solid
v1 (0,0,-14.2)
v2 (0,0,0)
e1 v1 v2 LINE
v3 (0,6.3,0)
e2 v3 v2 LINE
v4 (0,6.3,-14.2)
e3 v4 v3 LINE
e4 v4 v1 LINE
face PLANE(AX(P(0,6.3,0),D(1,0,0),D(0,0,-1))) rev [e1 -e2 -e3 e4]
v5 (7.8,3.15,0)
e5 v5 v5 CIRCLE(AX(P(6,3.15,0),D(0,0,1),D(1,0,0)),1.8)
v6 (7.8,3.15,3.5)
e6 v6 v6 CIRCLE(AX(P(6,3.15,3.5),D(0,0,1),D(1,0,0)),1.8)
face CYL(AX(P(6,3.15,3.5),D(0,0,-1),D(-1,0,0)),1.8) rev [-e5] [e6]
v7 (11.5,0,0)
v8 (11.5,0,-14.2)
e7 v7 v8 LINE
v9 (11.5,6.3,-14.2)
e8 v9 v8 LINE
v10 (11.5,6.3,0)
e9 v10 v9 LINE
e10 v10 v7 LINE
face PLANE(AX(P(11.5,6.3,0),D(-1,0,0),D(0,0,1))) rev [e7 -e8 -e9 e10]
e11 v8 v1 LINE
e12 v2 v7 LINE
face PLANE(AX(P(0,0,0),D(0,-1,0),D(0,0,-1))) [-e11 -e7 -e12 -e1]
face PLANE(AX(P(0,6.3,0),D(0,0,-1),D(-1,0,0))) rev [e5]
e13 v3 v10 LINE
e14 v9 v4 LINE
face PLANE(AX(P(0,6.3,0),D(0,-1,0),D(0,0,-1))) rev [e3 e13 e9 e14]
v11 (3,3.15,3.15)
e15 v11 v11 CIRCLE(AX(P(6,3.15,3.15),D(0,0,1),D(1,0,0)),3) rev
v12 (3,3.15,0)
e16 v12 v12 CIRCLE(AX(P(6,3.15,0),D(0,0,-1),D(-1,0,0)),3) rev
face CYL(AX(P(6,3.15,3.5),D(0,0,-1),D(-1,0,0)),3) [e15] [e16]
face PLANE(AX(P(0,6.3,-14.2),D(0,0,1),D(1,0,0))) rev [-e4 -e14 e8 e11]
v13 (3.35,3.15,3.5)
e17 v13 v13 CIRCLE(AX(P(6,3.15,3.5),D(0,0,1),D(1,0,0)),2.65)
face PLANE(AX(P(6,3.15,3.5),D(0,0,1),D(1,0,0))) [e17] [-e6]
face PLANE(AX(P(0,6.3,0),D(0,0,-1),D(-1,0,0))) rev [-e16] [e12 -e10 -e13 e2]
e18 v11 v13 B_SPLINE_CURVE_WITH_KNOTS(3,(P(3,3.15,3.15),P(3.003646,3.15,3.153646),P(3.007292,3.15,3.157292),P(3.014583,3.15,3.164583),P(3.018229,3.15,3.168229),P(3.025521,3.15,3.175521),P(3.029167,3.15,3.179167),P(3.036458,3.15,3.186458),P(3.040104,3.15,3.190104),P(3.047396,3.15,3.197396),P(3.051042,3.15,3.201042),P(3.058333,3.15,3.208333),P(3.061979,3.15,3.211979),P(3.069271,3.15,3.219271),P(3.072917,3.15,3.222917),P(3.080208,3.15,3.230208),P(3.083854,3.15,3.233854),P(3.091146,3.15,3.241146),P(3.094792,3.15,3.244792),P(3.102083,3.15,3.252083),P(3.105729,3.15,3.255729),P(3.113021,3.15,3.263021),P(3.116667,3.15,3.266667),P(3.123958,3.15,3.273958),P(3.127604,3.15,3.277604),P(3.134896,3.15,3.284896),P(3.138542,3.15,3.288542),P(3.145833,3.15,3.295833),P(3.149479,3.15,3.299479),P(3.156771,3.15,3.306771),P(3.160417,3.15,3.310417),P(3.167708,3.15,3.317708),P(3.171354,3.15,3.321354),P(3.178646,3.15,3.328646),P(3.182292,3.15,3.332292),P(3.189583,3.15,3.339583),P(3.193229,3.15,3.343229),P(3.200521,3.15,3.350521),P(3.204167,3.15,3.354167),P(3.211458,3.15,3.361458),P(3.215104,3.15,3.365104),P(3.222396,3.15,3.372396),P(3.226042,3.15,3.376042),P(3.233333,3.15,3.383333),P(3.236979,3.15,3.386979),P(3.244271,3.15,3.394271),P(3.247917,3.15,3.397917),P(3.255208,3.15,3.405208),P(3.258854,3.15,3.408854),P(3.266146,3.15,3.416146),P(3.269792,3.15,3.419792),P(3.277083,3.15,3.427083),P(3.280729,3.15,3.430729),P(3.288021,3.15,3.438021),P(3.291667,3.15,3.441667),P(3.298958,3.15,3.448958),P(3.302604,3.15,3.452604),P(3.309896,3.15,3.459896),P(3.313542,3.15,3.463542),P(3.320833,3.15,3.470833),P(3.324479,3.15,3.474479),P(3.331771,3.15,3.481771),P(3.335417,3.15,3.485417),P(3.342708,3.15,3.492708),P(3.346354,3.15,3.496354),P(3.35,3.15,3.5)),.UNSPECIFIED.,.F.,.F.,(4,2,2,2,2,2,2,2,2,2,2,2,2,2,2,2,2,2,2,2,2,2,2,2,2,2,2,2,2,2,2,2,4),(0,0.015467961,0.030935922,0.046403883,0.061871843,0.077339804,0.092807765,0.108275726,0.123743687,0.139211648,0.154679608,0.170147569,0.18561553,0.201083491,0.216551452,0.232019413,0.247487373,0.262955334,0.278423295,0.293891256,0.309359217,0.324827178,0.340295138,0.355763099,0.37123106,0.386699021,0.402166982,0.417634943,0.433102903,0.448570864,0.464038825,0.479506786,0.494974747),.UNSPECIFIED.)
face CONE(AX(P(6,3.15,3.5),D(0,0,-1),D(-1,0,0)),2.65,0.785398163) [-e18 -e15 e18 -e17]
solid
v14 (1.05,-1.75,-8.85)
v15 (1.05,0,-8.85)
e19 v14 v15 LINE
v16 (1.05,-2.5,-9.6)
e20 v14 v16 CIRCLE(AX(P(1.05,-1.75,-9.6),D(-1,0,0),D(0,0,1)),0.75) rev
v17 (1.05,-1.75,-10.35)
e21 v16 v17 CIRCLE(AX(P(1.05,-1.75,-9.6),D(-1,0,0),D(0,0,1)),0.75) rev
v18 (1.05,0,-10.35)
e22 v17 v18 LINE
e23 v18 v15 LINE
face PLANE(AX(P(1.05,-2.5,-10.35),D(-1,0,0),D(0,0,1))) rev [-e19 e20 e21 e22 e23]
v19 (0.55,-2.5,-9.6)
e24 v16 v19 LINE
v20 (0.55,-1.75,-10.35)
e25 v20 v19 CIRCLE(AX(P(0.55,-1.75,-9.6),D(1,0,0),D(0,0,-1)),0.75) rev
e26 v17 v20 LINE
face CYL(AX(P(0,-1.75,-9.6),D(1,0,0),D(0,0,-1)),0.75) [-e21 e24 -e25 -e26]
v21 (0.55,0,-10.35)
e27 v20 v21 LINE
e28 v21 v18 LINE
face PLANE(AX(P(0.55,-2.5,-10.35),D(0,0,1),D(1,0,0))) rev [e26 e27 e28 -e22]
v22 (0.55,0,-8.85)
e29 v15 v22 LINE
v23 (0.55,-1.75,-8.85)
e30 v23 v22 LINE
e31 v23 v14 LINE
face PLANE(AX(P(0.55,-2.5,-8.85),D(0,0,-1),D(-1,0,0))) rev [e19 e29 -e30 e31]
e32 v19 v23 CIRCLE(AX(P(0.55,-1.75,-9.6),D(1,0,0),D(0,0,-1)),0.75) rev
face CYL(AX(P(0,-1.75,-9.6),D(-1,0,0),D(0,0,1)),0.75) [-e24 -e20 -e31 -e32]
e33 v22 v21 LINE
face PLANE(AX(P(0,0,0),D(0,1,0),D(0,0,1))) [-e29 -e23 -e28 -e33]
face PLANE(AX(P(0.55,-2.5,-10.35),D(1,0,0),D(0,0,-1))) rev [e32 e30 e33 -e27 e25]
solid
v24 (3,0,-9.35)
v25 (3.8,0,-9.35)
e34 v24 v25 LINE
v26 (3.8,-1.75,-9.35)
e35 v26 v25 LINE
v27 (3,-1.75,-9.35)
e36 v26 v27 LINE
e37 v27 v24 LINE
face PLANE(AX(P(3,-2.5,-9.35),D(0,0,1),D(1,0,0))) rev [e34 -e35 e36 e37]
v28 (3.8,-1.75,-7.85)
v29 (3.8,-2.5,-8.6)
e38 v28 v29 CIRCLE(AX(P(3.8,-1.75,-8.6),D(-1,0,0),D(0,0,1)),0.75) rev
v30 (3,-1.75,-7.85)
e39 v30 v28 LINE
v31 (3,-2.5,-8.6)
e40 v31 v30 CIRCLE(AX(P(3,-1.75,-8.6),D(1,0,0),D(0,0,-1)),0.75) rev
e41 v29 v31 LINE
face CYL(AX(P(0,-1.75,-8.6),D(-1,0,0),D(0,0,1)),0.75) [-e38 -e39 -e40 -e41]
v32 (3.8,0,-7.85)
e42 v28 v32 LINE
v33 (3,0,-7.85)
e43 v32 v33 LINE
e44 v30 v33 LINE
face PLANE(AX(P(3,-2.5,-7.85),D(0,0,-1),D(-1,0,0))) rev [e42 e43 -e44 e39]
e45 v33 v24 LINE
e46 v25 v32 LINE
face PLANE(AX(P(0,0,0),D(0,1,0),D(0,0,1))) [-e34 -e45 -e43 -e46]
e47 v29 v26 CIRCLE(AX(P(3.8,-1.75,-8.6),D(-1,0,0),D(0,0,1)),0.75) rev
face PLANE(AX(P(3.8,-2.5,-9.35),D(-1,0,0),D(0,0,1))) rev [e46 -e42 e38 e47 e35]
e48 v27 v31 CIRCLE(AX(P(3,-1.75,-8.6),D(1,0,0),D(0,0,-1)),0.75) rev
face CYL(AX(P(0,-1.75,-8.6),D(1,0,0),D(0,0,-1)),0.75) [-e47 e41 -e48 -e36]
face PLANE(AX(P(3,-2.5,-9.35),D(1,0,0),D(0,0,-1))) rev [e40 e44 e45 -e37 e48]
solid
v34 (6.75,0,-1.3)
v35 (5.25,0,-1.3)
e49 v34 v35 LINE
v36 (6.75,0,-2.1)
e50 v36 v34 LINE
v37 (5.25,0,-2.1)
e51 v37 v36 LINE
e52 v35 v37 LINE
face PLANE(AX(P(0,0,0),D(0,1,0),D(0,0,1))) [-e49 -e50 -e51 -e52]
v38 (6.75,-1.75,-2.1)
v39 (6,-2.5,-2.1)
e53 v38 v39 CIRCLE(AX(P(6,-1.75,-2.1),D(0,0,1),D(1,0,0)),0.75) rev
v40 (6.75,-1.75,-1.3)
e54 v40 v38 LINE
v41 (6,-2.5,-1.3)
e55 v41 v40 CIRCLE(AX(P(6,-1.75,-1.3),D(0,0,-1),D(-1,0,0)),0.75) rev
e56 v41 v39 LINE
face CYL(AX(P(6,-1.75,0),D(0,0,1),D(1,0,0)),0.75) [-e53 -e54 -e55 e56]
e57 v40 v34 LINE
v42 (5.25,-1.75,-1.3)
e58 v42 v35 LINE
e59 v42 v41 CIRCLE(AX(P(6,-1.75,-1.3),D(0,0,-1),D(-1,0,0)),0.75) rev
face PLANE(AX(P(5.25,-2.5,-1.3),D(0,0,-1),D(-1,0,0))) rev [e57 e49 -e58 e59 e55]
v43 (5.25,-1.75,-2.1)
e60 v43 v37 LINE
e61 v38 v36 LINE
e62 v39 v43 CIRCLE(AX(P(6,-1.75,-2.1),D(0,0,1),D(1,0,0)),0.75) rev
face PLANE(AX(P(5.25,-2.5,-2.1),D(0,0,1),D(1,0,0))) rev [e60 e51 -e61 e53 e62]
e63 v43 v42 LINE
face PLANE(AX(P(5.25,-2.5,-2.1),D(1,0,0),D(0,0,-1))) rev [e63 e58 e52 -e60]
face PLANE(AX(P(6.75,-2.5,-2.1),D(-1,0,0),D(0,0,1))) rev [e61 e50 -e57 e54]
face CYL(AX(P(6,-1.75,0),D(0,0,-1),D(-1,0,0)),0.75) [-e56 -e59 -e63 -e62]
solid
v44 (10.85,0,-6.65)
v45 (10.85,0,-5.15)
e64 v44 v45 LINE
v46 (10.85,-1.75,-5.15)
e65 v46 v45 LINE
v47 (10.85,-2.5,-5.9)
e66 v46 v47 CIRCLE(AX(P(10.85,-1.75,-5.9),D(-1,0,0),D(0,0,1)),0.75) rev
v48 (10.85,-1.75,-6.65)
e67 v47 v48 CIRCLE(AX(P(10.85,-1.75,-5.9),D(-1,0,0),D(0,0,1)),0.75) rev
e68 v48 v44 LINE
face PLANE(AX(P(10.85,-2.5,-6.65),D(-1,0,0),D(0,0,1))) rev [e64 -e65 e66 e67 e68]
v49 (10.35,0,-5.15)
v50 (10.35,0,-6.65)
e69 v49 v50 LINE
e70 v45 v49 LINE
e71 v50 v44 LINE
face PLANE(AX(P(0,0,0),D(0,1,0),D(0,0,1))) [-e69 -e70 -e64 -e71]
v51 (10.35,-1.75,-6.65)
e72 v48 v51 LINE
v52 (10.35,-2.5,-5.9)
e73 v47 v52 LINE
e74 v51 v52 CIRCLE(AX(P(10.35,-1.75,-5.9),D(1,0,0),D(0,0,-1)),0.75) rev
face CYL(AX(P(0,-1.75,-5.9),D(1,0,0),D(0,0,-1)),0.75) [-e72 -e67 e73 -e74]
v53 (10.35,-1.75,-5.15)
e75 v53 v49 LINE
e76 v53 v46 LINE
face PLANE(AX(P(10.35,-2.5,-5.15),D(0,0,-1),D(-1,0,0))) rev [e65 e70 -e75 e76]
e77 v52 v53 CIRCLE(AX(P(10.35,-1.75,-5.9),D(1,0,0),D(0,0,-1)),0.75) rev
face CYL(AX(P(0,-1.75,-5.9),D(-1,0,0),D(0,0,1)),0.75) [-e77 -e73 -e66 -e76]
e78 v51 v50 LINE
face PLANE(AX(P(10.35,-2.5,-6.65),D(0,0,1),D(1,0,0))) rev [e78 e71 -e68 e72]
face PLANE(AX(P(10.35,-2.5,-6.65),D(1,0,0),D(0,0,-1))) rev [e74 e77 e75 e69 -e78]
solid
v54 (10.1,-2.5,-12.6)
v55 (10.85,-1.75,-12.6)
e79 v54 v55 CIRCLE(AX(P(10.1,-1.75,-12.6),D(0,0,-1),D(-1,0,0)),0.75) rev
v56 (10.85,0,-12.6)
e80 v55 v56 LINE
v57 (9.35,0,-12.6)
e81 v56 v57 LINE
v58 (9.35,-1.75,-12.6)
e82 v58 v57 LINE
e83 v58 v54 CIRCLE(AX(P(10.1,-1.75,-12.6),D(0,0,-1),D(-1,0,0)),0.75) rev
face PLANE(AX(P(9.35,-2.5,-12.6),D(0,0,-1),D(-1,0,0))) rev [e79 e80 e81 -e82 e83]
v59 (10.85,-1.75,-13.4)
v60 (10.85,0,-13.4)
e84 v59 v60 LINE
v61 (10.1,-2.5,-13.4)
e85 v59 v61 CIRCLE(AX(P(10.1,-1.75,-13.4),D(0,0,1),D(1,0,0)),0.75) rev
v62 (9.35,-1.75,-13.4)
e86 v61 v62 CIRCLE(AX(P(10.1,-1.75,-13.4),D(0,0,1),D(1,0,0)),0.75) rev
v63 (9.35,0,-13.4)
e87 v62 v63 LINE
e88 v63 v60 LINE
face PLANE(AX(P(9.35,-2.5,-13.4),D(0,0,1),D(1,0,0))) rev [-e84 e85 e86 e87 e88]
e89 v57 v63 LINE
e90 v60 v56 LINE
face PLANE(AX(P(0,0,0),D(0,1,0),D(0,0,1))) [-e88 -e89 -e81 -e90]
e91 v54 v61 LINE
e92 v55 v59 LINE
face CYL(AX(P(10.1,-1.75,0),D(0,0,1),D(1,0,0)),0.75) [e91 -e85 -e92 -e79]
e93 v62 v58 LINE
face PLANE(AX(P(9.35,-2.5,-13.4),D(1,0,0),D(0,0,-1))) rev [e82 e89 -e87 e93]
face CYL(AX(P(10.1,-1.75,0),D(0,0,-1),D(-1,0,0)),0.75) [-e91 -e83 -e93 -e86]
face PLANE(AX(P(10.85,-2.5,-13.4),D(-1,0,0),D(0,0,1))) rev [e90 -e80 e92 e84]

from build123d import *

# Parameters (mm, degrees)
SKETCH1_W             = 11.5
SKETCH1_H             = 14.2
BOSS_EXTRUDE1_DEPTH   = 6.3
SKETCH2_R             = 3
SKETCH2_R_2           = 1.8
BOSS_EXTRUDE2_DEPTH   = 3.5
SKETCH3_W             = 1.5
SKETCH3_H             = 0.8
BOSS_EXTRUDE3_DEPTH   = 2.5
SKETCH3_W_2           = 0.8
SKETCH3_H_2           = 1.5
BOSS_EXTRUDE3_2_DEPTH = 2.5
SKETCH3_W_3           = 0.5
BOSS_EXTRUDE3_3_DEPTH = 2.5
BOSS_EXTRUDE3_4_DEPTH = 2.5
BOSS_EXTRUDE3_5_DEPTH = 2.5
FILLET1_R             = 0.75
FILLET2_R             = 0.75
FILLET3_R             = 0.75
FILLET4_R             = 0.75
FILLET5_R             = 0.75
CHAMFER1_SIZE         = 0.35


with BuildPart() as part:
    # Sketch1 → Boss-Extrude1 (new body)
    with BuildSketch(Plane(origin=(0, 0, 0), x_dir=(1, 0, 0), z_dir=(0, 1, 0))):
        with Locations((5.75, 7.1)):
            Rectangle(SKETCH1_W, SKETCH1_H)
    extrude(amount=BOSS_EXTRUDE1_DEPTH)

    # Sketch2 → Boss-Extrude2 (add)
    with BuildSketch(Plane.XY):
        with Locations(Location((6, 3.15, 0), (0, 0, 180))):
            Circle(SKETCH2_R)
        with Locations((6, 3.15)):
            Circle(SKETCH2_R_2, mode=Mode.SUBTRACT)
    extrude(amount=BOSS_EXTRUDE2_DEPTH)

    # Chamfer1
    chamfer1_edges = [part.edges().sort_by_distance(p)[0] for p in [
        (9, 3.15, 3.5),
    ]]
    chamfer(chamfer1_edges, length=CHAMFER1_SIZE)


with BuildPart() as body_2:
    # Sketch3 → Boss-Extrude3 (new body)
    with BuildSketch(Plane.XZ):
        with Locations((6, -1.7)):
            Rectangle(SKETCH3_W, SKETCH3_H)
    extrude(amount=BOSS_EXTRUDE3_DEPTH)

    # Fillet1
    fillet1_edges = [body_2.edges().sort_by_distance(p)[0] for p in [
        (6.75, -2.5, -1.7),
        (5.25, -2.5, -1.7),
    ]]
    fillet(fillet1_edges, radius=FILLET1_R - 0.0001)  # a hair under: the kernel refuses the full size


with BuildPart() as body_3:
    # Sketch3 → Boss-Extrude3 2 (new body)
    with BuildSketch(Plane.XZ):
        with Locations((3.4, -8.6)):
            Rectangle(SKETCH3_W_2, SKETCH3_H_2)
    extrude(amount=BOSS_EXTRUDE3_2_DEPTH)

    # Fillet3
    fillet3_edges = [body_3.edges().sort_by_distance(p)[0] for p in [
        (3.4, -2.5, -9.35),
        (3.4, -2.5, -7.85),
    ]]
    fillet(fillet3_edges, radius=FILLET3_R - 0.0001)  # a hair under: the kernel refuses the full size


with BuildPart() as body_4:
    # Sketch3 → Boss-Extrude3 3 (new body)
    with BuildSketch(Plane.XZ):
        with Locations((0.8, -9.6)):
            Rectangle(SKETCH3_W_3, SKETCH3_H_2)
    extrude(amount=BOSS_EXTRUDE3_3_DEPTH)

    # Fillet4
    fillet4_edges = [body_4.edges().sort_by_distance(p)[0] for p in [
        (0.8, -2.5, -10.35),
        (0.8, -2.5, -8.85),
    ]]
    fillet(fillet4_edges, radius=FILLET4_R - 0.0001)  # a hair under: the kernel refuses the full size


with BuildPart() as body_5:
    # Sketch3 → Boss-Extrude3 4 (new body)
    with BuildSketch(Plane.XZ):
        with Locations((10.6, -5.9)):
            Rectangle(SKETCH3_W_3, SKETCH3_H_2)
    extrude(amount=BOSS_EXTRUDE3_4_DEPTH)

    # Fillet2
    fillet2_edges = [body_5.edges().sort_by_distance(p)[0] for p in [
        (10.6, -2.5, -6.65),
        (10.6, -2.5, -5.15),
    ]]
    fillet(fillet2_edges, radius=FILLET2_R - 0.0001)  # a hair under: the kernel refuses the full size


with BuildPart() as body_6:
    # Sketch3 → Boss-Extrude3 5 (new body)
    with BuildSketch(Plane.XZ):
        with Locations((10.1, -13)):
            Rectangle(SKETCH3_W, SKETCH3_H)
    extrude(amount=BOSS_EXTRUDE3_5_DEPTH)

    # Fillet5
    fillet5_edges = [body_6.edges().sort_by_distance(p)[0] for p in [
        (10.85, -2.5, -13),
        (9.35, -2.5, -13),
    ]]
    fillet(fillet5_edges, radius=FILLET5_R - 0.0001)  # a hair under: the kernel refuses the full size


solid = Compound([part.part, body_2.part, body_3.part, body_4.part, body_5.part, body_6.part])
